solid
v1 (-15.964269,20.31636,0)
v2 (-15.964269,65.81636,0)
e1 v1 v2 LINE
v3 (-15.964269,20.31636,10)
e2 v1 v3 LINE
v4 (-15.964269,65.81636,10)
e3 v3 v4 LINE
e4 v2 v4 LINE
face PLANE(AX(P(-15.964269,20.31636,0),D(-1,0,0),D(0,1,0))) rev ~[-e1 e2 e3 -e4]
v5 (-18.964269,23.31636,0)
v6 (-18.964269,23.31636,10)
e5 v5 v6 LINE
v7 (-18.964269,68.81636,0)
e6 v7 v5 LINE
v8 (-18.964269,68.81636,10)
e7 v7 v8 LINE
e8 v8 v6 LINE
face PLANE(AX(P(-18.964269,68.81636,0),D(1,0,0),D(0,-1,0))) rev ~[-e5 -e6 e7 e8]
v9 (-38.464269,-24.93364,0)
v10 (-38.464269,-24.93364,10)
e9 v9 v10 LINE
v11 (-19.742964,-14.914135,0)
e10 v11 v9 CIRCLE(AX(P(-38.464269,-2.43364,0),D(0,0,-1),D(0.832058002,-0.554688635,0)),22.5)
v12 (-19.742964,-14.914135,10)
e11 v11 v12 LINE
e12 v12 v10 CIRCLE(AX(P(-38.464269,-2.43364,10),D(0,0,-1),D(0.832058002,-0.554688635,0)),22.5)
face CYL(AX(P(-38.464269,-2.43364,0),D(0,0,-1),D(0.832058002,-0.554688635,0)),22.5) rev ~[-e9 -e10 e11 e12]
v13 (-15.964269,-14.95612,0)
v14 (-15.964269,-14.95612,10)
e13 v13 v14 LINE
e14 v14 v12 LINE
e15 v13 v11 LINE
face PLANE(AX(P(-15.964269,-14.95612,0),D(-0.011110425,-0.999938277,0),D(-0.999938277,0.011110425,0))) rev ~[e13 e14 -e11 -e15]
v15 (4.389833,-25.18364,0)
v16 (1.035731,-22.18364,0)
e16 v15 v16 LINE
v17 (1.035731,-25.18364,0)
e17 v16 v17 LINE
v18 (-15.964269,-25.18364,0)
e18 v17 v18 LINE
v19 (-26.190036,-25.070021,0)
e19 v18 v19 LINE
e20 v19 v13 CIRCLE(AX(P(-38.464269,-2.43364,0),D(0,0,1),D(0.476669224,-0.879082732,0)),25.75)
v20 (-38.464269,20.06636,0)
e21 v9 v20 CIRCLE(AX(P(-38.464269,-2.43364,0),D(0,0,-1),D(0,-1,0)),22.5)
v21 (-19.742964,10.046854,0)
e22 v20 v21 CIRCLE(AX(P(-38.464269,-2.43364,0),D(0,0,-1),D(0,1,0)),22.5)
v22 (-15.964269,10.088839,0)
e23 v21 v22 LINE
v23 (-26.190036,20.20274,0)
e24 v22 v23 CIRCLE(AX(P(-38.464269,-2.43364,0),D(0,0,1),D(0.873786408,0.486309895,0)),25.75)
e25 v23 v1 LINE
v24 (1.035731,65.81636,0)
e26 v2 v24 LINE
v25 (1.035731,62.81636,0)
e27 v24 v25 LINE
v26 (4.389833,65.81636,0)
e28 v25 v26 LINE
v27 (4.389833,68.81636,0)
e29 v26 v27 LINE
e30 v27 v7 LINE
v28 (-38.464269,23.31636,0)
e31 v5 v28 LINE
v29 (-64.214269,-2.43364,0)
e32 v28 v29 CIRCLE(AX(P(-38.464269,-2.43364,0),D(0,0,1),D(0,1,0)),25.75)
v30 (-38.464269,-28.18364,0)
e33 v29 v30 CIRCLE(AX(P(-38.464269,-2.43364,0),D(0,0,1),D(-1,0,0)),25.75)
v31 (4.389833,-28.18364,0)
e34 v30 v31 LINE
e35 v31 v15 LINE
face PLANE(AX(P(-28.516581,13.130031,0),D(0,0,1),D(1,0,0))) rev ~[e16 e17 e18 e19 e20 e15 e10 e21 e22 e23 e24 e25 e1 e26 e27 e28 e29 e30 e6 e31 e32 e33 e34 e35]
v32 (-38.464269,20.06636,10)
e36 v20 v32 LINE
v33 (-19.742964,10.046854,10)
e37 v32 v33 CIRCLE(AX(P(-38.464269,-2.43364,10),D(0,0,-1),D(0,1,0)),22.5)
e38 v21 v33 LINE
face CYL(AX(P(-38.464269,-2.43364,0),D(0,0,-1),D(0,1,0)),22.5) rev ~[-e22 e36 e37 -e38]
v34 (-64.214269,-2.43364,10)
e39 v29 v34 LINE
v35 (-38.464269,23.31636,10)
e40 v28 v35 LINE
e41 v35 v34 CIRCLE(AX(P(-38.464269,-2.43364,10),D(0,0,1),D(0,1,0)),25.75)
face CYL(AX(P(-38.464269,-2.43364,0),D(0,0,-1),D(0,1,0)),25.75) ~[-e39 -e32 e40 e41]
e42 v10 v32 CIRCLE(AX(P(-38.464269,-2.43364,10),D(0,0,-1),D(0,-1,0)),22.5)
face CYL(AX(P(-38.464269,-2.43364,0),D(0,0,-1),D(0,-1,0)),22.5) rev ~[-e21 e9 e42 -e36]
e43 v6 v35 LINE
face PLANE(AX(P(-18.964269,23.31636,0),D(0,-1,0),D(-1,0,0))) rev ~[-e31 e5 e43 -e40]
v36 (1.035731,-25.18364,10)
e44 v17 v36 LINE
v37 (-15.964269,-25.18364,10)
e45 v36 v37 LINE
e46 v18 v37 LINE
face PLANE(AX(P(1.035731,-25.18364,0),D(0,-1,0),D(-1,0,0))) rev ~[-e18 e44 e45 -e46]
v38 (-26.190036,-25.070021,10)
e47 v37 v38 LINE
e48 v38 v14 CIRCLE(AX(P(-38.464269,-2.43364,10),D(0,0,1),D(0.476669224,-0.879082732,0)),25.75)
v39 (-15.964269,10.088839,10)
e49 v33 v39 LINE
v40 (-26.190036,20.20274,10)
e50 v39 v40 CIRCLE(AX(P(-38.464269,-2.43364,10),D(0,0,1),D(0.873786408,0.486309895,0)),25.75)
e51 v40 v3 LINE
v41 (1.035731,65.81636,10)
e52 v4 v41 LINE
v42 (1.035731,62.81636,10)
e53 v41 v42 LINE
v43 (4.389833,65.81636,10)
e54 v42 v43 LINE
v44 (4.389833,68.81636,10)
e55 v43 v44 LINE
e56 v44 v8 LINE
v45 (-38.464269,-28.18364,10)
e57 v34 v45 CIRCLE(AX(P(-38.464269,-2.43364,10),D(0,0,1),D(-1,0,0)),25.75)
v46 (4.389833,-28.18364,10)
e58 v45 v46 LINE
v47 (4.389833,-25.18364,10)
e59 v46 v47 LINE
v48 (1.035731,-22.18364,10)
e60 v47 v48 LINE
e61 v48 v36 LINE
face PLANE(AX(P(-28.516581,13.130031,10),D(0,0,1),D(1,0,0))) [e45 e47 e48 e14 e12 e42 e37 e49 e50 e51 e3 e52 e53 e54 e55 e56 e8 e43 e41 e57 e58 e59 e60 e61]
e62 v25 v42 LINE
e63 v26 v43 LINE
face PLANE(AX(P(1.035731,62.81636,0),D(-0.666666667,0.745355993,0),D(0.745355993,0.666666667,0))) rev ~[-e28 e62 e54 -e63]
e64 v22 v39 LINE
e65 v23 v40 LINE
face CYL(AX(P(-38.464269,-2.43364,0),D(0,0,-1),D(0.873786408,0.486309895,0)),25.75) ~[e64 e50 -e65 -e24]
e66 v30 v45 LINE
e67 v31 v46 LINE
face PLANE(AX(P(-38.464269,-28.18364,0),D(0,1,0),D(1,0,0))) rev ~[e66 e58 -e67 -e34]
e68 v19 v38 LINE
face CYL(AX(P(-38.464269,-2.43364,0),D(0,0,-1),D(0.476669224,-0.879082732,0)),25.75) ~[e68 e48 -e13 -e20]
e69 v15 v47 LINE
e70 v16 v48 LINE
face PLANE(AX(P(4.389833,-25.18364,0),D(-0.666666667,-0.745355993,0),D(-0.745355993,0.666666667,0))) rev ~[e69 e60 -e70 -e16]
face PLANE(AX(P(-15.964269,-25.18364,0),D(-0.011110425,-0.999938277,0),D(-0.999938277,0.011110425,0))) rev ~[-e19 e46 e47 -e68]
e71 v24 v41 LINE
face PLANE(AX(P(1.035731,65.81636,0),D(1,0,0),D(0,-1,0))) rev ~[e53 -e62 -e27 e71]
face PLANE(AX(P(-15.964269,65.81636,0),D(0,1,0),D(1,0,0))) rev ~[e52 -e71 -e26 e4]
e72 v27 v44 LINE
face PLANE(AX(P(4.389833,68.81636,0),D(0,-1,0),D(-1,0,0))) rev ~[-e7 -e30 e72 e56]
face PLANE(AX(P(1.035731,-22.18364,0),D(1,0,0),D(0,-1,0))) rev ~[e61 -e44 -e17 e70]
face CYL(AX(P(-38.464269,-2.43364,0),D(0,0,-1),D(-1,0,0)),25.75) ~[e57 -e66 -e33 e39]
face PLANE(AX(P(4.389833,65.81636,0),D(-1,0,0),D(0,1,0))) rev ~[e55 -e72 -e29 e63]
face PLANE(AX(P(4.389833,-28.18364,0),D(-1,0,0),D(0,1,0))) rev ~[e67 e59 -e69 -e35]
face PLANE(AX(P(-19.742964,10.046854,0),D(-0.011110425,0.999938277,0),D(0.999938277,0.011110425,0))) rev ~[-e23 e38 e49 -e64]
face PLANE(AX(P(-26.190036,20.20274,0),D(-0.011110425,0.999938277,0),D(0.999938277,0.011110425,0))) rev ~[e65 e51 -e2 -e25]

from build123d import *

# Parameters (mm, degrees)
F1_DEPTH = 10


# Not quite as in the source:
# - a feature names something its author has since deleted; it is built from what else it names


with BuildPart() as f1:
    # F0 (on Top) → F1 (new body)
    with BuildSketch(Plane.XY):
        with BuildLine():
            Line((-18.9642689968, 23.316359701), (-38.4642689968, 23.316359701))
            ThreePointArc((-38.4642689968, 23.316359701), (-56.6722686123, 15.7743593166), (-64.2142689968, -2.433640299))
            ThreePointArc((-64.2142689968, -2.433640299), (-56.6722686123, -20.6416399145), (-38.4642689968, -28.183640299))
            Line((-38.4642689968, -28.183640299), (4.3898329695, -28.183640299))
            Line((4.3898329695, -28.183640299), (4.3898329695, -25.183640299))
            Line((4.3898329695, -25.183640299), (1.0357310032, -22.183640299))
            Line((1.0357310032, -22.183640299), (1.0357310032, -25.183640299))
            Line((1.0357310032, -25.183640299), (-15.9642689968, -25.183640299))
            Line((-15.9642689968, -25.183640299), (-26.1900364695, -25.0700206604))
            Line((-26.1900364695, -25.0700206604), (-38.4642689968, -24.933640299))
            ThreePointArc((-38.4642689968, -24.933640299), (-54.3741715735, -18.3435428757), (-60.9642689968, -2.433640299))
            ThreePointArc((-60.9642689968, -2.433640299), (-54.3741715735, 13.4762622777), (-38.4642689968, 20.066359701))
            ThreePointArc((-38.4642689968, 20.066359701), (-27.8473278519, 17.4039644135), (-19.7429639579, 10.0468539878))
            Line((-19.7429639579, 10.0468539878), (-15.9642689968, 10.0888394874))
            ThreePointArc((-15.9642689968, 10.0888394874), (-20.3566861052, 15.8742252736), (-26.1900364695, 20.2027400624))
            Line((-26.1900364695, 20.2027400624), (-15.9642689968, 20.316359701))
            Line((-15.9642689968, 20.316359701), (-15.9642689968, 65.816359701))
            Line((-15.9642689968, 65.816359701), (1.0357310032, 65.816359701))
            Line((1.0357310032, 65.816359701), (1.0357310032, 62.816359701))
            Line((1.0357310032, 62.816359701), (4.3898329695, 65.816359701))
            Line((4.3898329695, 65.816359701), (4.3898329695, 68.816359701))
            Line((4.3898329695, 68.816359701), (-15.9642689968, 68.816359701))
            Line((-15.9642689968, 68.816359701), (-18.9642689968, 68.816359701))
            Line((-18.9642689968, 68.816359701), (-18.9642689968, 23.316359701))
        make_face()
        with BuildLine():
            Line((-38.4642689968, -24.933640299), (-26.1900364695, -25.0700206604))
            ThreePointArc((-26.1900364695, -25.0700206604), (-20.3566861052, -20.7415058716), (-15.9642689968, -14.9561200853))
            Line((-15.9642689968, -14.9561200853), (-19.7429639579, -14.9141345858))
            ThreePointArc((-19.7429639579, -14.9141345858), (-27.8473278519, -22.2712450114), (-38.4642689968, -24.933640299))
        make_face()
    extrude(amount=F1_DEPTH)


solid = f1.part
